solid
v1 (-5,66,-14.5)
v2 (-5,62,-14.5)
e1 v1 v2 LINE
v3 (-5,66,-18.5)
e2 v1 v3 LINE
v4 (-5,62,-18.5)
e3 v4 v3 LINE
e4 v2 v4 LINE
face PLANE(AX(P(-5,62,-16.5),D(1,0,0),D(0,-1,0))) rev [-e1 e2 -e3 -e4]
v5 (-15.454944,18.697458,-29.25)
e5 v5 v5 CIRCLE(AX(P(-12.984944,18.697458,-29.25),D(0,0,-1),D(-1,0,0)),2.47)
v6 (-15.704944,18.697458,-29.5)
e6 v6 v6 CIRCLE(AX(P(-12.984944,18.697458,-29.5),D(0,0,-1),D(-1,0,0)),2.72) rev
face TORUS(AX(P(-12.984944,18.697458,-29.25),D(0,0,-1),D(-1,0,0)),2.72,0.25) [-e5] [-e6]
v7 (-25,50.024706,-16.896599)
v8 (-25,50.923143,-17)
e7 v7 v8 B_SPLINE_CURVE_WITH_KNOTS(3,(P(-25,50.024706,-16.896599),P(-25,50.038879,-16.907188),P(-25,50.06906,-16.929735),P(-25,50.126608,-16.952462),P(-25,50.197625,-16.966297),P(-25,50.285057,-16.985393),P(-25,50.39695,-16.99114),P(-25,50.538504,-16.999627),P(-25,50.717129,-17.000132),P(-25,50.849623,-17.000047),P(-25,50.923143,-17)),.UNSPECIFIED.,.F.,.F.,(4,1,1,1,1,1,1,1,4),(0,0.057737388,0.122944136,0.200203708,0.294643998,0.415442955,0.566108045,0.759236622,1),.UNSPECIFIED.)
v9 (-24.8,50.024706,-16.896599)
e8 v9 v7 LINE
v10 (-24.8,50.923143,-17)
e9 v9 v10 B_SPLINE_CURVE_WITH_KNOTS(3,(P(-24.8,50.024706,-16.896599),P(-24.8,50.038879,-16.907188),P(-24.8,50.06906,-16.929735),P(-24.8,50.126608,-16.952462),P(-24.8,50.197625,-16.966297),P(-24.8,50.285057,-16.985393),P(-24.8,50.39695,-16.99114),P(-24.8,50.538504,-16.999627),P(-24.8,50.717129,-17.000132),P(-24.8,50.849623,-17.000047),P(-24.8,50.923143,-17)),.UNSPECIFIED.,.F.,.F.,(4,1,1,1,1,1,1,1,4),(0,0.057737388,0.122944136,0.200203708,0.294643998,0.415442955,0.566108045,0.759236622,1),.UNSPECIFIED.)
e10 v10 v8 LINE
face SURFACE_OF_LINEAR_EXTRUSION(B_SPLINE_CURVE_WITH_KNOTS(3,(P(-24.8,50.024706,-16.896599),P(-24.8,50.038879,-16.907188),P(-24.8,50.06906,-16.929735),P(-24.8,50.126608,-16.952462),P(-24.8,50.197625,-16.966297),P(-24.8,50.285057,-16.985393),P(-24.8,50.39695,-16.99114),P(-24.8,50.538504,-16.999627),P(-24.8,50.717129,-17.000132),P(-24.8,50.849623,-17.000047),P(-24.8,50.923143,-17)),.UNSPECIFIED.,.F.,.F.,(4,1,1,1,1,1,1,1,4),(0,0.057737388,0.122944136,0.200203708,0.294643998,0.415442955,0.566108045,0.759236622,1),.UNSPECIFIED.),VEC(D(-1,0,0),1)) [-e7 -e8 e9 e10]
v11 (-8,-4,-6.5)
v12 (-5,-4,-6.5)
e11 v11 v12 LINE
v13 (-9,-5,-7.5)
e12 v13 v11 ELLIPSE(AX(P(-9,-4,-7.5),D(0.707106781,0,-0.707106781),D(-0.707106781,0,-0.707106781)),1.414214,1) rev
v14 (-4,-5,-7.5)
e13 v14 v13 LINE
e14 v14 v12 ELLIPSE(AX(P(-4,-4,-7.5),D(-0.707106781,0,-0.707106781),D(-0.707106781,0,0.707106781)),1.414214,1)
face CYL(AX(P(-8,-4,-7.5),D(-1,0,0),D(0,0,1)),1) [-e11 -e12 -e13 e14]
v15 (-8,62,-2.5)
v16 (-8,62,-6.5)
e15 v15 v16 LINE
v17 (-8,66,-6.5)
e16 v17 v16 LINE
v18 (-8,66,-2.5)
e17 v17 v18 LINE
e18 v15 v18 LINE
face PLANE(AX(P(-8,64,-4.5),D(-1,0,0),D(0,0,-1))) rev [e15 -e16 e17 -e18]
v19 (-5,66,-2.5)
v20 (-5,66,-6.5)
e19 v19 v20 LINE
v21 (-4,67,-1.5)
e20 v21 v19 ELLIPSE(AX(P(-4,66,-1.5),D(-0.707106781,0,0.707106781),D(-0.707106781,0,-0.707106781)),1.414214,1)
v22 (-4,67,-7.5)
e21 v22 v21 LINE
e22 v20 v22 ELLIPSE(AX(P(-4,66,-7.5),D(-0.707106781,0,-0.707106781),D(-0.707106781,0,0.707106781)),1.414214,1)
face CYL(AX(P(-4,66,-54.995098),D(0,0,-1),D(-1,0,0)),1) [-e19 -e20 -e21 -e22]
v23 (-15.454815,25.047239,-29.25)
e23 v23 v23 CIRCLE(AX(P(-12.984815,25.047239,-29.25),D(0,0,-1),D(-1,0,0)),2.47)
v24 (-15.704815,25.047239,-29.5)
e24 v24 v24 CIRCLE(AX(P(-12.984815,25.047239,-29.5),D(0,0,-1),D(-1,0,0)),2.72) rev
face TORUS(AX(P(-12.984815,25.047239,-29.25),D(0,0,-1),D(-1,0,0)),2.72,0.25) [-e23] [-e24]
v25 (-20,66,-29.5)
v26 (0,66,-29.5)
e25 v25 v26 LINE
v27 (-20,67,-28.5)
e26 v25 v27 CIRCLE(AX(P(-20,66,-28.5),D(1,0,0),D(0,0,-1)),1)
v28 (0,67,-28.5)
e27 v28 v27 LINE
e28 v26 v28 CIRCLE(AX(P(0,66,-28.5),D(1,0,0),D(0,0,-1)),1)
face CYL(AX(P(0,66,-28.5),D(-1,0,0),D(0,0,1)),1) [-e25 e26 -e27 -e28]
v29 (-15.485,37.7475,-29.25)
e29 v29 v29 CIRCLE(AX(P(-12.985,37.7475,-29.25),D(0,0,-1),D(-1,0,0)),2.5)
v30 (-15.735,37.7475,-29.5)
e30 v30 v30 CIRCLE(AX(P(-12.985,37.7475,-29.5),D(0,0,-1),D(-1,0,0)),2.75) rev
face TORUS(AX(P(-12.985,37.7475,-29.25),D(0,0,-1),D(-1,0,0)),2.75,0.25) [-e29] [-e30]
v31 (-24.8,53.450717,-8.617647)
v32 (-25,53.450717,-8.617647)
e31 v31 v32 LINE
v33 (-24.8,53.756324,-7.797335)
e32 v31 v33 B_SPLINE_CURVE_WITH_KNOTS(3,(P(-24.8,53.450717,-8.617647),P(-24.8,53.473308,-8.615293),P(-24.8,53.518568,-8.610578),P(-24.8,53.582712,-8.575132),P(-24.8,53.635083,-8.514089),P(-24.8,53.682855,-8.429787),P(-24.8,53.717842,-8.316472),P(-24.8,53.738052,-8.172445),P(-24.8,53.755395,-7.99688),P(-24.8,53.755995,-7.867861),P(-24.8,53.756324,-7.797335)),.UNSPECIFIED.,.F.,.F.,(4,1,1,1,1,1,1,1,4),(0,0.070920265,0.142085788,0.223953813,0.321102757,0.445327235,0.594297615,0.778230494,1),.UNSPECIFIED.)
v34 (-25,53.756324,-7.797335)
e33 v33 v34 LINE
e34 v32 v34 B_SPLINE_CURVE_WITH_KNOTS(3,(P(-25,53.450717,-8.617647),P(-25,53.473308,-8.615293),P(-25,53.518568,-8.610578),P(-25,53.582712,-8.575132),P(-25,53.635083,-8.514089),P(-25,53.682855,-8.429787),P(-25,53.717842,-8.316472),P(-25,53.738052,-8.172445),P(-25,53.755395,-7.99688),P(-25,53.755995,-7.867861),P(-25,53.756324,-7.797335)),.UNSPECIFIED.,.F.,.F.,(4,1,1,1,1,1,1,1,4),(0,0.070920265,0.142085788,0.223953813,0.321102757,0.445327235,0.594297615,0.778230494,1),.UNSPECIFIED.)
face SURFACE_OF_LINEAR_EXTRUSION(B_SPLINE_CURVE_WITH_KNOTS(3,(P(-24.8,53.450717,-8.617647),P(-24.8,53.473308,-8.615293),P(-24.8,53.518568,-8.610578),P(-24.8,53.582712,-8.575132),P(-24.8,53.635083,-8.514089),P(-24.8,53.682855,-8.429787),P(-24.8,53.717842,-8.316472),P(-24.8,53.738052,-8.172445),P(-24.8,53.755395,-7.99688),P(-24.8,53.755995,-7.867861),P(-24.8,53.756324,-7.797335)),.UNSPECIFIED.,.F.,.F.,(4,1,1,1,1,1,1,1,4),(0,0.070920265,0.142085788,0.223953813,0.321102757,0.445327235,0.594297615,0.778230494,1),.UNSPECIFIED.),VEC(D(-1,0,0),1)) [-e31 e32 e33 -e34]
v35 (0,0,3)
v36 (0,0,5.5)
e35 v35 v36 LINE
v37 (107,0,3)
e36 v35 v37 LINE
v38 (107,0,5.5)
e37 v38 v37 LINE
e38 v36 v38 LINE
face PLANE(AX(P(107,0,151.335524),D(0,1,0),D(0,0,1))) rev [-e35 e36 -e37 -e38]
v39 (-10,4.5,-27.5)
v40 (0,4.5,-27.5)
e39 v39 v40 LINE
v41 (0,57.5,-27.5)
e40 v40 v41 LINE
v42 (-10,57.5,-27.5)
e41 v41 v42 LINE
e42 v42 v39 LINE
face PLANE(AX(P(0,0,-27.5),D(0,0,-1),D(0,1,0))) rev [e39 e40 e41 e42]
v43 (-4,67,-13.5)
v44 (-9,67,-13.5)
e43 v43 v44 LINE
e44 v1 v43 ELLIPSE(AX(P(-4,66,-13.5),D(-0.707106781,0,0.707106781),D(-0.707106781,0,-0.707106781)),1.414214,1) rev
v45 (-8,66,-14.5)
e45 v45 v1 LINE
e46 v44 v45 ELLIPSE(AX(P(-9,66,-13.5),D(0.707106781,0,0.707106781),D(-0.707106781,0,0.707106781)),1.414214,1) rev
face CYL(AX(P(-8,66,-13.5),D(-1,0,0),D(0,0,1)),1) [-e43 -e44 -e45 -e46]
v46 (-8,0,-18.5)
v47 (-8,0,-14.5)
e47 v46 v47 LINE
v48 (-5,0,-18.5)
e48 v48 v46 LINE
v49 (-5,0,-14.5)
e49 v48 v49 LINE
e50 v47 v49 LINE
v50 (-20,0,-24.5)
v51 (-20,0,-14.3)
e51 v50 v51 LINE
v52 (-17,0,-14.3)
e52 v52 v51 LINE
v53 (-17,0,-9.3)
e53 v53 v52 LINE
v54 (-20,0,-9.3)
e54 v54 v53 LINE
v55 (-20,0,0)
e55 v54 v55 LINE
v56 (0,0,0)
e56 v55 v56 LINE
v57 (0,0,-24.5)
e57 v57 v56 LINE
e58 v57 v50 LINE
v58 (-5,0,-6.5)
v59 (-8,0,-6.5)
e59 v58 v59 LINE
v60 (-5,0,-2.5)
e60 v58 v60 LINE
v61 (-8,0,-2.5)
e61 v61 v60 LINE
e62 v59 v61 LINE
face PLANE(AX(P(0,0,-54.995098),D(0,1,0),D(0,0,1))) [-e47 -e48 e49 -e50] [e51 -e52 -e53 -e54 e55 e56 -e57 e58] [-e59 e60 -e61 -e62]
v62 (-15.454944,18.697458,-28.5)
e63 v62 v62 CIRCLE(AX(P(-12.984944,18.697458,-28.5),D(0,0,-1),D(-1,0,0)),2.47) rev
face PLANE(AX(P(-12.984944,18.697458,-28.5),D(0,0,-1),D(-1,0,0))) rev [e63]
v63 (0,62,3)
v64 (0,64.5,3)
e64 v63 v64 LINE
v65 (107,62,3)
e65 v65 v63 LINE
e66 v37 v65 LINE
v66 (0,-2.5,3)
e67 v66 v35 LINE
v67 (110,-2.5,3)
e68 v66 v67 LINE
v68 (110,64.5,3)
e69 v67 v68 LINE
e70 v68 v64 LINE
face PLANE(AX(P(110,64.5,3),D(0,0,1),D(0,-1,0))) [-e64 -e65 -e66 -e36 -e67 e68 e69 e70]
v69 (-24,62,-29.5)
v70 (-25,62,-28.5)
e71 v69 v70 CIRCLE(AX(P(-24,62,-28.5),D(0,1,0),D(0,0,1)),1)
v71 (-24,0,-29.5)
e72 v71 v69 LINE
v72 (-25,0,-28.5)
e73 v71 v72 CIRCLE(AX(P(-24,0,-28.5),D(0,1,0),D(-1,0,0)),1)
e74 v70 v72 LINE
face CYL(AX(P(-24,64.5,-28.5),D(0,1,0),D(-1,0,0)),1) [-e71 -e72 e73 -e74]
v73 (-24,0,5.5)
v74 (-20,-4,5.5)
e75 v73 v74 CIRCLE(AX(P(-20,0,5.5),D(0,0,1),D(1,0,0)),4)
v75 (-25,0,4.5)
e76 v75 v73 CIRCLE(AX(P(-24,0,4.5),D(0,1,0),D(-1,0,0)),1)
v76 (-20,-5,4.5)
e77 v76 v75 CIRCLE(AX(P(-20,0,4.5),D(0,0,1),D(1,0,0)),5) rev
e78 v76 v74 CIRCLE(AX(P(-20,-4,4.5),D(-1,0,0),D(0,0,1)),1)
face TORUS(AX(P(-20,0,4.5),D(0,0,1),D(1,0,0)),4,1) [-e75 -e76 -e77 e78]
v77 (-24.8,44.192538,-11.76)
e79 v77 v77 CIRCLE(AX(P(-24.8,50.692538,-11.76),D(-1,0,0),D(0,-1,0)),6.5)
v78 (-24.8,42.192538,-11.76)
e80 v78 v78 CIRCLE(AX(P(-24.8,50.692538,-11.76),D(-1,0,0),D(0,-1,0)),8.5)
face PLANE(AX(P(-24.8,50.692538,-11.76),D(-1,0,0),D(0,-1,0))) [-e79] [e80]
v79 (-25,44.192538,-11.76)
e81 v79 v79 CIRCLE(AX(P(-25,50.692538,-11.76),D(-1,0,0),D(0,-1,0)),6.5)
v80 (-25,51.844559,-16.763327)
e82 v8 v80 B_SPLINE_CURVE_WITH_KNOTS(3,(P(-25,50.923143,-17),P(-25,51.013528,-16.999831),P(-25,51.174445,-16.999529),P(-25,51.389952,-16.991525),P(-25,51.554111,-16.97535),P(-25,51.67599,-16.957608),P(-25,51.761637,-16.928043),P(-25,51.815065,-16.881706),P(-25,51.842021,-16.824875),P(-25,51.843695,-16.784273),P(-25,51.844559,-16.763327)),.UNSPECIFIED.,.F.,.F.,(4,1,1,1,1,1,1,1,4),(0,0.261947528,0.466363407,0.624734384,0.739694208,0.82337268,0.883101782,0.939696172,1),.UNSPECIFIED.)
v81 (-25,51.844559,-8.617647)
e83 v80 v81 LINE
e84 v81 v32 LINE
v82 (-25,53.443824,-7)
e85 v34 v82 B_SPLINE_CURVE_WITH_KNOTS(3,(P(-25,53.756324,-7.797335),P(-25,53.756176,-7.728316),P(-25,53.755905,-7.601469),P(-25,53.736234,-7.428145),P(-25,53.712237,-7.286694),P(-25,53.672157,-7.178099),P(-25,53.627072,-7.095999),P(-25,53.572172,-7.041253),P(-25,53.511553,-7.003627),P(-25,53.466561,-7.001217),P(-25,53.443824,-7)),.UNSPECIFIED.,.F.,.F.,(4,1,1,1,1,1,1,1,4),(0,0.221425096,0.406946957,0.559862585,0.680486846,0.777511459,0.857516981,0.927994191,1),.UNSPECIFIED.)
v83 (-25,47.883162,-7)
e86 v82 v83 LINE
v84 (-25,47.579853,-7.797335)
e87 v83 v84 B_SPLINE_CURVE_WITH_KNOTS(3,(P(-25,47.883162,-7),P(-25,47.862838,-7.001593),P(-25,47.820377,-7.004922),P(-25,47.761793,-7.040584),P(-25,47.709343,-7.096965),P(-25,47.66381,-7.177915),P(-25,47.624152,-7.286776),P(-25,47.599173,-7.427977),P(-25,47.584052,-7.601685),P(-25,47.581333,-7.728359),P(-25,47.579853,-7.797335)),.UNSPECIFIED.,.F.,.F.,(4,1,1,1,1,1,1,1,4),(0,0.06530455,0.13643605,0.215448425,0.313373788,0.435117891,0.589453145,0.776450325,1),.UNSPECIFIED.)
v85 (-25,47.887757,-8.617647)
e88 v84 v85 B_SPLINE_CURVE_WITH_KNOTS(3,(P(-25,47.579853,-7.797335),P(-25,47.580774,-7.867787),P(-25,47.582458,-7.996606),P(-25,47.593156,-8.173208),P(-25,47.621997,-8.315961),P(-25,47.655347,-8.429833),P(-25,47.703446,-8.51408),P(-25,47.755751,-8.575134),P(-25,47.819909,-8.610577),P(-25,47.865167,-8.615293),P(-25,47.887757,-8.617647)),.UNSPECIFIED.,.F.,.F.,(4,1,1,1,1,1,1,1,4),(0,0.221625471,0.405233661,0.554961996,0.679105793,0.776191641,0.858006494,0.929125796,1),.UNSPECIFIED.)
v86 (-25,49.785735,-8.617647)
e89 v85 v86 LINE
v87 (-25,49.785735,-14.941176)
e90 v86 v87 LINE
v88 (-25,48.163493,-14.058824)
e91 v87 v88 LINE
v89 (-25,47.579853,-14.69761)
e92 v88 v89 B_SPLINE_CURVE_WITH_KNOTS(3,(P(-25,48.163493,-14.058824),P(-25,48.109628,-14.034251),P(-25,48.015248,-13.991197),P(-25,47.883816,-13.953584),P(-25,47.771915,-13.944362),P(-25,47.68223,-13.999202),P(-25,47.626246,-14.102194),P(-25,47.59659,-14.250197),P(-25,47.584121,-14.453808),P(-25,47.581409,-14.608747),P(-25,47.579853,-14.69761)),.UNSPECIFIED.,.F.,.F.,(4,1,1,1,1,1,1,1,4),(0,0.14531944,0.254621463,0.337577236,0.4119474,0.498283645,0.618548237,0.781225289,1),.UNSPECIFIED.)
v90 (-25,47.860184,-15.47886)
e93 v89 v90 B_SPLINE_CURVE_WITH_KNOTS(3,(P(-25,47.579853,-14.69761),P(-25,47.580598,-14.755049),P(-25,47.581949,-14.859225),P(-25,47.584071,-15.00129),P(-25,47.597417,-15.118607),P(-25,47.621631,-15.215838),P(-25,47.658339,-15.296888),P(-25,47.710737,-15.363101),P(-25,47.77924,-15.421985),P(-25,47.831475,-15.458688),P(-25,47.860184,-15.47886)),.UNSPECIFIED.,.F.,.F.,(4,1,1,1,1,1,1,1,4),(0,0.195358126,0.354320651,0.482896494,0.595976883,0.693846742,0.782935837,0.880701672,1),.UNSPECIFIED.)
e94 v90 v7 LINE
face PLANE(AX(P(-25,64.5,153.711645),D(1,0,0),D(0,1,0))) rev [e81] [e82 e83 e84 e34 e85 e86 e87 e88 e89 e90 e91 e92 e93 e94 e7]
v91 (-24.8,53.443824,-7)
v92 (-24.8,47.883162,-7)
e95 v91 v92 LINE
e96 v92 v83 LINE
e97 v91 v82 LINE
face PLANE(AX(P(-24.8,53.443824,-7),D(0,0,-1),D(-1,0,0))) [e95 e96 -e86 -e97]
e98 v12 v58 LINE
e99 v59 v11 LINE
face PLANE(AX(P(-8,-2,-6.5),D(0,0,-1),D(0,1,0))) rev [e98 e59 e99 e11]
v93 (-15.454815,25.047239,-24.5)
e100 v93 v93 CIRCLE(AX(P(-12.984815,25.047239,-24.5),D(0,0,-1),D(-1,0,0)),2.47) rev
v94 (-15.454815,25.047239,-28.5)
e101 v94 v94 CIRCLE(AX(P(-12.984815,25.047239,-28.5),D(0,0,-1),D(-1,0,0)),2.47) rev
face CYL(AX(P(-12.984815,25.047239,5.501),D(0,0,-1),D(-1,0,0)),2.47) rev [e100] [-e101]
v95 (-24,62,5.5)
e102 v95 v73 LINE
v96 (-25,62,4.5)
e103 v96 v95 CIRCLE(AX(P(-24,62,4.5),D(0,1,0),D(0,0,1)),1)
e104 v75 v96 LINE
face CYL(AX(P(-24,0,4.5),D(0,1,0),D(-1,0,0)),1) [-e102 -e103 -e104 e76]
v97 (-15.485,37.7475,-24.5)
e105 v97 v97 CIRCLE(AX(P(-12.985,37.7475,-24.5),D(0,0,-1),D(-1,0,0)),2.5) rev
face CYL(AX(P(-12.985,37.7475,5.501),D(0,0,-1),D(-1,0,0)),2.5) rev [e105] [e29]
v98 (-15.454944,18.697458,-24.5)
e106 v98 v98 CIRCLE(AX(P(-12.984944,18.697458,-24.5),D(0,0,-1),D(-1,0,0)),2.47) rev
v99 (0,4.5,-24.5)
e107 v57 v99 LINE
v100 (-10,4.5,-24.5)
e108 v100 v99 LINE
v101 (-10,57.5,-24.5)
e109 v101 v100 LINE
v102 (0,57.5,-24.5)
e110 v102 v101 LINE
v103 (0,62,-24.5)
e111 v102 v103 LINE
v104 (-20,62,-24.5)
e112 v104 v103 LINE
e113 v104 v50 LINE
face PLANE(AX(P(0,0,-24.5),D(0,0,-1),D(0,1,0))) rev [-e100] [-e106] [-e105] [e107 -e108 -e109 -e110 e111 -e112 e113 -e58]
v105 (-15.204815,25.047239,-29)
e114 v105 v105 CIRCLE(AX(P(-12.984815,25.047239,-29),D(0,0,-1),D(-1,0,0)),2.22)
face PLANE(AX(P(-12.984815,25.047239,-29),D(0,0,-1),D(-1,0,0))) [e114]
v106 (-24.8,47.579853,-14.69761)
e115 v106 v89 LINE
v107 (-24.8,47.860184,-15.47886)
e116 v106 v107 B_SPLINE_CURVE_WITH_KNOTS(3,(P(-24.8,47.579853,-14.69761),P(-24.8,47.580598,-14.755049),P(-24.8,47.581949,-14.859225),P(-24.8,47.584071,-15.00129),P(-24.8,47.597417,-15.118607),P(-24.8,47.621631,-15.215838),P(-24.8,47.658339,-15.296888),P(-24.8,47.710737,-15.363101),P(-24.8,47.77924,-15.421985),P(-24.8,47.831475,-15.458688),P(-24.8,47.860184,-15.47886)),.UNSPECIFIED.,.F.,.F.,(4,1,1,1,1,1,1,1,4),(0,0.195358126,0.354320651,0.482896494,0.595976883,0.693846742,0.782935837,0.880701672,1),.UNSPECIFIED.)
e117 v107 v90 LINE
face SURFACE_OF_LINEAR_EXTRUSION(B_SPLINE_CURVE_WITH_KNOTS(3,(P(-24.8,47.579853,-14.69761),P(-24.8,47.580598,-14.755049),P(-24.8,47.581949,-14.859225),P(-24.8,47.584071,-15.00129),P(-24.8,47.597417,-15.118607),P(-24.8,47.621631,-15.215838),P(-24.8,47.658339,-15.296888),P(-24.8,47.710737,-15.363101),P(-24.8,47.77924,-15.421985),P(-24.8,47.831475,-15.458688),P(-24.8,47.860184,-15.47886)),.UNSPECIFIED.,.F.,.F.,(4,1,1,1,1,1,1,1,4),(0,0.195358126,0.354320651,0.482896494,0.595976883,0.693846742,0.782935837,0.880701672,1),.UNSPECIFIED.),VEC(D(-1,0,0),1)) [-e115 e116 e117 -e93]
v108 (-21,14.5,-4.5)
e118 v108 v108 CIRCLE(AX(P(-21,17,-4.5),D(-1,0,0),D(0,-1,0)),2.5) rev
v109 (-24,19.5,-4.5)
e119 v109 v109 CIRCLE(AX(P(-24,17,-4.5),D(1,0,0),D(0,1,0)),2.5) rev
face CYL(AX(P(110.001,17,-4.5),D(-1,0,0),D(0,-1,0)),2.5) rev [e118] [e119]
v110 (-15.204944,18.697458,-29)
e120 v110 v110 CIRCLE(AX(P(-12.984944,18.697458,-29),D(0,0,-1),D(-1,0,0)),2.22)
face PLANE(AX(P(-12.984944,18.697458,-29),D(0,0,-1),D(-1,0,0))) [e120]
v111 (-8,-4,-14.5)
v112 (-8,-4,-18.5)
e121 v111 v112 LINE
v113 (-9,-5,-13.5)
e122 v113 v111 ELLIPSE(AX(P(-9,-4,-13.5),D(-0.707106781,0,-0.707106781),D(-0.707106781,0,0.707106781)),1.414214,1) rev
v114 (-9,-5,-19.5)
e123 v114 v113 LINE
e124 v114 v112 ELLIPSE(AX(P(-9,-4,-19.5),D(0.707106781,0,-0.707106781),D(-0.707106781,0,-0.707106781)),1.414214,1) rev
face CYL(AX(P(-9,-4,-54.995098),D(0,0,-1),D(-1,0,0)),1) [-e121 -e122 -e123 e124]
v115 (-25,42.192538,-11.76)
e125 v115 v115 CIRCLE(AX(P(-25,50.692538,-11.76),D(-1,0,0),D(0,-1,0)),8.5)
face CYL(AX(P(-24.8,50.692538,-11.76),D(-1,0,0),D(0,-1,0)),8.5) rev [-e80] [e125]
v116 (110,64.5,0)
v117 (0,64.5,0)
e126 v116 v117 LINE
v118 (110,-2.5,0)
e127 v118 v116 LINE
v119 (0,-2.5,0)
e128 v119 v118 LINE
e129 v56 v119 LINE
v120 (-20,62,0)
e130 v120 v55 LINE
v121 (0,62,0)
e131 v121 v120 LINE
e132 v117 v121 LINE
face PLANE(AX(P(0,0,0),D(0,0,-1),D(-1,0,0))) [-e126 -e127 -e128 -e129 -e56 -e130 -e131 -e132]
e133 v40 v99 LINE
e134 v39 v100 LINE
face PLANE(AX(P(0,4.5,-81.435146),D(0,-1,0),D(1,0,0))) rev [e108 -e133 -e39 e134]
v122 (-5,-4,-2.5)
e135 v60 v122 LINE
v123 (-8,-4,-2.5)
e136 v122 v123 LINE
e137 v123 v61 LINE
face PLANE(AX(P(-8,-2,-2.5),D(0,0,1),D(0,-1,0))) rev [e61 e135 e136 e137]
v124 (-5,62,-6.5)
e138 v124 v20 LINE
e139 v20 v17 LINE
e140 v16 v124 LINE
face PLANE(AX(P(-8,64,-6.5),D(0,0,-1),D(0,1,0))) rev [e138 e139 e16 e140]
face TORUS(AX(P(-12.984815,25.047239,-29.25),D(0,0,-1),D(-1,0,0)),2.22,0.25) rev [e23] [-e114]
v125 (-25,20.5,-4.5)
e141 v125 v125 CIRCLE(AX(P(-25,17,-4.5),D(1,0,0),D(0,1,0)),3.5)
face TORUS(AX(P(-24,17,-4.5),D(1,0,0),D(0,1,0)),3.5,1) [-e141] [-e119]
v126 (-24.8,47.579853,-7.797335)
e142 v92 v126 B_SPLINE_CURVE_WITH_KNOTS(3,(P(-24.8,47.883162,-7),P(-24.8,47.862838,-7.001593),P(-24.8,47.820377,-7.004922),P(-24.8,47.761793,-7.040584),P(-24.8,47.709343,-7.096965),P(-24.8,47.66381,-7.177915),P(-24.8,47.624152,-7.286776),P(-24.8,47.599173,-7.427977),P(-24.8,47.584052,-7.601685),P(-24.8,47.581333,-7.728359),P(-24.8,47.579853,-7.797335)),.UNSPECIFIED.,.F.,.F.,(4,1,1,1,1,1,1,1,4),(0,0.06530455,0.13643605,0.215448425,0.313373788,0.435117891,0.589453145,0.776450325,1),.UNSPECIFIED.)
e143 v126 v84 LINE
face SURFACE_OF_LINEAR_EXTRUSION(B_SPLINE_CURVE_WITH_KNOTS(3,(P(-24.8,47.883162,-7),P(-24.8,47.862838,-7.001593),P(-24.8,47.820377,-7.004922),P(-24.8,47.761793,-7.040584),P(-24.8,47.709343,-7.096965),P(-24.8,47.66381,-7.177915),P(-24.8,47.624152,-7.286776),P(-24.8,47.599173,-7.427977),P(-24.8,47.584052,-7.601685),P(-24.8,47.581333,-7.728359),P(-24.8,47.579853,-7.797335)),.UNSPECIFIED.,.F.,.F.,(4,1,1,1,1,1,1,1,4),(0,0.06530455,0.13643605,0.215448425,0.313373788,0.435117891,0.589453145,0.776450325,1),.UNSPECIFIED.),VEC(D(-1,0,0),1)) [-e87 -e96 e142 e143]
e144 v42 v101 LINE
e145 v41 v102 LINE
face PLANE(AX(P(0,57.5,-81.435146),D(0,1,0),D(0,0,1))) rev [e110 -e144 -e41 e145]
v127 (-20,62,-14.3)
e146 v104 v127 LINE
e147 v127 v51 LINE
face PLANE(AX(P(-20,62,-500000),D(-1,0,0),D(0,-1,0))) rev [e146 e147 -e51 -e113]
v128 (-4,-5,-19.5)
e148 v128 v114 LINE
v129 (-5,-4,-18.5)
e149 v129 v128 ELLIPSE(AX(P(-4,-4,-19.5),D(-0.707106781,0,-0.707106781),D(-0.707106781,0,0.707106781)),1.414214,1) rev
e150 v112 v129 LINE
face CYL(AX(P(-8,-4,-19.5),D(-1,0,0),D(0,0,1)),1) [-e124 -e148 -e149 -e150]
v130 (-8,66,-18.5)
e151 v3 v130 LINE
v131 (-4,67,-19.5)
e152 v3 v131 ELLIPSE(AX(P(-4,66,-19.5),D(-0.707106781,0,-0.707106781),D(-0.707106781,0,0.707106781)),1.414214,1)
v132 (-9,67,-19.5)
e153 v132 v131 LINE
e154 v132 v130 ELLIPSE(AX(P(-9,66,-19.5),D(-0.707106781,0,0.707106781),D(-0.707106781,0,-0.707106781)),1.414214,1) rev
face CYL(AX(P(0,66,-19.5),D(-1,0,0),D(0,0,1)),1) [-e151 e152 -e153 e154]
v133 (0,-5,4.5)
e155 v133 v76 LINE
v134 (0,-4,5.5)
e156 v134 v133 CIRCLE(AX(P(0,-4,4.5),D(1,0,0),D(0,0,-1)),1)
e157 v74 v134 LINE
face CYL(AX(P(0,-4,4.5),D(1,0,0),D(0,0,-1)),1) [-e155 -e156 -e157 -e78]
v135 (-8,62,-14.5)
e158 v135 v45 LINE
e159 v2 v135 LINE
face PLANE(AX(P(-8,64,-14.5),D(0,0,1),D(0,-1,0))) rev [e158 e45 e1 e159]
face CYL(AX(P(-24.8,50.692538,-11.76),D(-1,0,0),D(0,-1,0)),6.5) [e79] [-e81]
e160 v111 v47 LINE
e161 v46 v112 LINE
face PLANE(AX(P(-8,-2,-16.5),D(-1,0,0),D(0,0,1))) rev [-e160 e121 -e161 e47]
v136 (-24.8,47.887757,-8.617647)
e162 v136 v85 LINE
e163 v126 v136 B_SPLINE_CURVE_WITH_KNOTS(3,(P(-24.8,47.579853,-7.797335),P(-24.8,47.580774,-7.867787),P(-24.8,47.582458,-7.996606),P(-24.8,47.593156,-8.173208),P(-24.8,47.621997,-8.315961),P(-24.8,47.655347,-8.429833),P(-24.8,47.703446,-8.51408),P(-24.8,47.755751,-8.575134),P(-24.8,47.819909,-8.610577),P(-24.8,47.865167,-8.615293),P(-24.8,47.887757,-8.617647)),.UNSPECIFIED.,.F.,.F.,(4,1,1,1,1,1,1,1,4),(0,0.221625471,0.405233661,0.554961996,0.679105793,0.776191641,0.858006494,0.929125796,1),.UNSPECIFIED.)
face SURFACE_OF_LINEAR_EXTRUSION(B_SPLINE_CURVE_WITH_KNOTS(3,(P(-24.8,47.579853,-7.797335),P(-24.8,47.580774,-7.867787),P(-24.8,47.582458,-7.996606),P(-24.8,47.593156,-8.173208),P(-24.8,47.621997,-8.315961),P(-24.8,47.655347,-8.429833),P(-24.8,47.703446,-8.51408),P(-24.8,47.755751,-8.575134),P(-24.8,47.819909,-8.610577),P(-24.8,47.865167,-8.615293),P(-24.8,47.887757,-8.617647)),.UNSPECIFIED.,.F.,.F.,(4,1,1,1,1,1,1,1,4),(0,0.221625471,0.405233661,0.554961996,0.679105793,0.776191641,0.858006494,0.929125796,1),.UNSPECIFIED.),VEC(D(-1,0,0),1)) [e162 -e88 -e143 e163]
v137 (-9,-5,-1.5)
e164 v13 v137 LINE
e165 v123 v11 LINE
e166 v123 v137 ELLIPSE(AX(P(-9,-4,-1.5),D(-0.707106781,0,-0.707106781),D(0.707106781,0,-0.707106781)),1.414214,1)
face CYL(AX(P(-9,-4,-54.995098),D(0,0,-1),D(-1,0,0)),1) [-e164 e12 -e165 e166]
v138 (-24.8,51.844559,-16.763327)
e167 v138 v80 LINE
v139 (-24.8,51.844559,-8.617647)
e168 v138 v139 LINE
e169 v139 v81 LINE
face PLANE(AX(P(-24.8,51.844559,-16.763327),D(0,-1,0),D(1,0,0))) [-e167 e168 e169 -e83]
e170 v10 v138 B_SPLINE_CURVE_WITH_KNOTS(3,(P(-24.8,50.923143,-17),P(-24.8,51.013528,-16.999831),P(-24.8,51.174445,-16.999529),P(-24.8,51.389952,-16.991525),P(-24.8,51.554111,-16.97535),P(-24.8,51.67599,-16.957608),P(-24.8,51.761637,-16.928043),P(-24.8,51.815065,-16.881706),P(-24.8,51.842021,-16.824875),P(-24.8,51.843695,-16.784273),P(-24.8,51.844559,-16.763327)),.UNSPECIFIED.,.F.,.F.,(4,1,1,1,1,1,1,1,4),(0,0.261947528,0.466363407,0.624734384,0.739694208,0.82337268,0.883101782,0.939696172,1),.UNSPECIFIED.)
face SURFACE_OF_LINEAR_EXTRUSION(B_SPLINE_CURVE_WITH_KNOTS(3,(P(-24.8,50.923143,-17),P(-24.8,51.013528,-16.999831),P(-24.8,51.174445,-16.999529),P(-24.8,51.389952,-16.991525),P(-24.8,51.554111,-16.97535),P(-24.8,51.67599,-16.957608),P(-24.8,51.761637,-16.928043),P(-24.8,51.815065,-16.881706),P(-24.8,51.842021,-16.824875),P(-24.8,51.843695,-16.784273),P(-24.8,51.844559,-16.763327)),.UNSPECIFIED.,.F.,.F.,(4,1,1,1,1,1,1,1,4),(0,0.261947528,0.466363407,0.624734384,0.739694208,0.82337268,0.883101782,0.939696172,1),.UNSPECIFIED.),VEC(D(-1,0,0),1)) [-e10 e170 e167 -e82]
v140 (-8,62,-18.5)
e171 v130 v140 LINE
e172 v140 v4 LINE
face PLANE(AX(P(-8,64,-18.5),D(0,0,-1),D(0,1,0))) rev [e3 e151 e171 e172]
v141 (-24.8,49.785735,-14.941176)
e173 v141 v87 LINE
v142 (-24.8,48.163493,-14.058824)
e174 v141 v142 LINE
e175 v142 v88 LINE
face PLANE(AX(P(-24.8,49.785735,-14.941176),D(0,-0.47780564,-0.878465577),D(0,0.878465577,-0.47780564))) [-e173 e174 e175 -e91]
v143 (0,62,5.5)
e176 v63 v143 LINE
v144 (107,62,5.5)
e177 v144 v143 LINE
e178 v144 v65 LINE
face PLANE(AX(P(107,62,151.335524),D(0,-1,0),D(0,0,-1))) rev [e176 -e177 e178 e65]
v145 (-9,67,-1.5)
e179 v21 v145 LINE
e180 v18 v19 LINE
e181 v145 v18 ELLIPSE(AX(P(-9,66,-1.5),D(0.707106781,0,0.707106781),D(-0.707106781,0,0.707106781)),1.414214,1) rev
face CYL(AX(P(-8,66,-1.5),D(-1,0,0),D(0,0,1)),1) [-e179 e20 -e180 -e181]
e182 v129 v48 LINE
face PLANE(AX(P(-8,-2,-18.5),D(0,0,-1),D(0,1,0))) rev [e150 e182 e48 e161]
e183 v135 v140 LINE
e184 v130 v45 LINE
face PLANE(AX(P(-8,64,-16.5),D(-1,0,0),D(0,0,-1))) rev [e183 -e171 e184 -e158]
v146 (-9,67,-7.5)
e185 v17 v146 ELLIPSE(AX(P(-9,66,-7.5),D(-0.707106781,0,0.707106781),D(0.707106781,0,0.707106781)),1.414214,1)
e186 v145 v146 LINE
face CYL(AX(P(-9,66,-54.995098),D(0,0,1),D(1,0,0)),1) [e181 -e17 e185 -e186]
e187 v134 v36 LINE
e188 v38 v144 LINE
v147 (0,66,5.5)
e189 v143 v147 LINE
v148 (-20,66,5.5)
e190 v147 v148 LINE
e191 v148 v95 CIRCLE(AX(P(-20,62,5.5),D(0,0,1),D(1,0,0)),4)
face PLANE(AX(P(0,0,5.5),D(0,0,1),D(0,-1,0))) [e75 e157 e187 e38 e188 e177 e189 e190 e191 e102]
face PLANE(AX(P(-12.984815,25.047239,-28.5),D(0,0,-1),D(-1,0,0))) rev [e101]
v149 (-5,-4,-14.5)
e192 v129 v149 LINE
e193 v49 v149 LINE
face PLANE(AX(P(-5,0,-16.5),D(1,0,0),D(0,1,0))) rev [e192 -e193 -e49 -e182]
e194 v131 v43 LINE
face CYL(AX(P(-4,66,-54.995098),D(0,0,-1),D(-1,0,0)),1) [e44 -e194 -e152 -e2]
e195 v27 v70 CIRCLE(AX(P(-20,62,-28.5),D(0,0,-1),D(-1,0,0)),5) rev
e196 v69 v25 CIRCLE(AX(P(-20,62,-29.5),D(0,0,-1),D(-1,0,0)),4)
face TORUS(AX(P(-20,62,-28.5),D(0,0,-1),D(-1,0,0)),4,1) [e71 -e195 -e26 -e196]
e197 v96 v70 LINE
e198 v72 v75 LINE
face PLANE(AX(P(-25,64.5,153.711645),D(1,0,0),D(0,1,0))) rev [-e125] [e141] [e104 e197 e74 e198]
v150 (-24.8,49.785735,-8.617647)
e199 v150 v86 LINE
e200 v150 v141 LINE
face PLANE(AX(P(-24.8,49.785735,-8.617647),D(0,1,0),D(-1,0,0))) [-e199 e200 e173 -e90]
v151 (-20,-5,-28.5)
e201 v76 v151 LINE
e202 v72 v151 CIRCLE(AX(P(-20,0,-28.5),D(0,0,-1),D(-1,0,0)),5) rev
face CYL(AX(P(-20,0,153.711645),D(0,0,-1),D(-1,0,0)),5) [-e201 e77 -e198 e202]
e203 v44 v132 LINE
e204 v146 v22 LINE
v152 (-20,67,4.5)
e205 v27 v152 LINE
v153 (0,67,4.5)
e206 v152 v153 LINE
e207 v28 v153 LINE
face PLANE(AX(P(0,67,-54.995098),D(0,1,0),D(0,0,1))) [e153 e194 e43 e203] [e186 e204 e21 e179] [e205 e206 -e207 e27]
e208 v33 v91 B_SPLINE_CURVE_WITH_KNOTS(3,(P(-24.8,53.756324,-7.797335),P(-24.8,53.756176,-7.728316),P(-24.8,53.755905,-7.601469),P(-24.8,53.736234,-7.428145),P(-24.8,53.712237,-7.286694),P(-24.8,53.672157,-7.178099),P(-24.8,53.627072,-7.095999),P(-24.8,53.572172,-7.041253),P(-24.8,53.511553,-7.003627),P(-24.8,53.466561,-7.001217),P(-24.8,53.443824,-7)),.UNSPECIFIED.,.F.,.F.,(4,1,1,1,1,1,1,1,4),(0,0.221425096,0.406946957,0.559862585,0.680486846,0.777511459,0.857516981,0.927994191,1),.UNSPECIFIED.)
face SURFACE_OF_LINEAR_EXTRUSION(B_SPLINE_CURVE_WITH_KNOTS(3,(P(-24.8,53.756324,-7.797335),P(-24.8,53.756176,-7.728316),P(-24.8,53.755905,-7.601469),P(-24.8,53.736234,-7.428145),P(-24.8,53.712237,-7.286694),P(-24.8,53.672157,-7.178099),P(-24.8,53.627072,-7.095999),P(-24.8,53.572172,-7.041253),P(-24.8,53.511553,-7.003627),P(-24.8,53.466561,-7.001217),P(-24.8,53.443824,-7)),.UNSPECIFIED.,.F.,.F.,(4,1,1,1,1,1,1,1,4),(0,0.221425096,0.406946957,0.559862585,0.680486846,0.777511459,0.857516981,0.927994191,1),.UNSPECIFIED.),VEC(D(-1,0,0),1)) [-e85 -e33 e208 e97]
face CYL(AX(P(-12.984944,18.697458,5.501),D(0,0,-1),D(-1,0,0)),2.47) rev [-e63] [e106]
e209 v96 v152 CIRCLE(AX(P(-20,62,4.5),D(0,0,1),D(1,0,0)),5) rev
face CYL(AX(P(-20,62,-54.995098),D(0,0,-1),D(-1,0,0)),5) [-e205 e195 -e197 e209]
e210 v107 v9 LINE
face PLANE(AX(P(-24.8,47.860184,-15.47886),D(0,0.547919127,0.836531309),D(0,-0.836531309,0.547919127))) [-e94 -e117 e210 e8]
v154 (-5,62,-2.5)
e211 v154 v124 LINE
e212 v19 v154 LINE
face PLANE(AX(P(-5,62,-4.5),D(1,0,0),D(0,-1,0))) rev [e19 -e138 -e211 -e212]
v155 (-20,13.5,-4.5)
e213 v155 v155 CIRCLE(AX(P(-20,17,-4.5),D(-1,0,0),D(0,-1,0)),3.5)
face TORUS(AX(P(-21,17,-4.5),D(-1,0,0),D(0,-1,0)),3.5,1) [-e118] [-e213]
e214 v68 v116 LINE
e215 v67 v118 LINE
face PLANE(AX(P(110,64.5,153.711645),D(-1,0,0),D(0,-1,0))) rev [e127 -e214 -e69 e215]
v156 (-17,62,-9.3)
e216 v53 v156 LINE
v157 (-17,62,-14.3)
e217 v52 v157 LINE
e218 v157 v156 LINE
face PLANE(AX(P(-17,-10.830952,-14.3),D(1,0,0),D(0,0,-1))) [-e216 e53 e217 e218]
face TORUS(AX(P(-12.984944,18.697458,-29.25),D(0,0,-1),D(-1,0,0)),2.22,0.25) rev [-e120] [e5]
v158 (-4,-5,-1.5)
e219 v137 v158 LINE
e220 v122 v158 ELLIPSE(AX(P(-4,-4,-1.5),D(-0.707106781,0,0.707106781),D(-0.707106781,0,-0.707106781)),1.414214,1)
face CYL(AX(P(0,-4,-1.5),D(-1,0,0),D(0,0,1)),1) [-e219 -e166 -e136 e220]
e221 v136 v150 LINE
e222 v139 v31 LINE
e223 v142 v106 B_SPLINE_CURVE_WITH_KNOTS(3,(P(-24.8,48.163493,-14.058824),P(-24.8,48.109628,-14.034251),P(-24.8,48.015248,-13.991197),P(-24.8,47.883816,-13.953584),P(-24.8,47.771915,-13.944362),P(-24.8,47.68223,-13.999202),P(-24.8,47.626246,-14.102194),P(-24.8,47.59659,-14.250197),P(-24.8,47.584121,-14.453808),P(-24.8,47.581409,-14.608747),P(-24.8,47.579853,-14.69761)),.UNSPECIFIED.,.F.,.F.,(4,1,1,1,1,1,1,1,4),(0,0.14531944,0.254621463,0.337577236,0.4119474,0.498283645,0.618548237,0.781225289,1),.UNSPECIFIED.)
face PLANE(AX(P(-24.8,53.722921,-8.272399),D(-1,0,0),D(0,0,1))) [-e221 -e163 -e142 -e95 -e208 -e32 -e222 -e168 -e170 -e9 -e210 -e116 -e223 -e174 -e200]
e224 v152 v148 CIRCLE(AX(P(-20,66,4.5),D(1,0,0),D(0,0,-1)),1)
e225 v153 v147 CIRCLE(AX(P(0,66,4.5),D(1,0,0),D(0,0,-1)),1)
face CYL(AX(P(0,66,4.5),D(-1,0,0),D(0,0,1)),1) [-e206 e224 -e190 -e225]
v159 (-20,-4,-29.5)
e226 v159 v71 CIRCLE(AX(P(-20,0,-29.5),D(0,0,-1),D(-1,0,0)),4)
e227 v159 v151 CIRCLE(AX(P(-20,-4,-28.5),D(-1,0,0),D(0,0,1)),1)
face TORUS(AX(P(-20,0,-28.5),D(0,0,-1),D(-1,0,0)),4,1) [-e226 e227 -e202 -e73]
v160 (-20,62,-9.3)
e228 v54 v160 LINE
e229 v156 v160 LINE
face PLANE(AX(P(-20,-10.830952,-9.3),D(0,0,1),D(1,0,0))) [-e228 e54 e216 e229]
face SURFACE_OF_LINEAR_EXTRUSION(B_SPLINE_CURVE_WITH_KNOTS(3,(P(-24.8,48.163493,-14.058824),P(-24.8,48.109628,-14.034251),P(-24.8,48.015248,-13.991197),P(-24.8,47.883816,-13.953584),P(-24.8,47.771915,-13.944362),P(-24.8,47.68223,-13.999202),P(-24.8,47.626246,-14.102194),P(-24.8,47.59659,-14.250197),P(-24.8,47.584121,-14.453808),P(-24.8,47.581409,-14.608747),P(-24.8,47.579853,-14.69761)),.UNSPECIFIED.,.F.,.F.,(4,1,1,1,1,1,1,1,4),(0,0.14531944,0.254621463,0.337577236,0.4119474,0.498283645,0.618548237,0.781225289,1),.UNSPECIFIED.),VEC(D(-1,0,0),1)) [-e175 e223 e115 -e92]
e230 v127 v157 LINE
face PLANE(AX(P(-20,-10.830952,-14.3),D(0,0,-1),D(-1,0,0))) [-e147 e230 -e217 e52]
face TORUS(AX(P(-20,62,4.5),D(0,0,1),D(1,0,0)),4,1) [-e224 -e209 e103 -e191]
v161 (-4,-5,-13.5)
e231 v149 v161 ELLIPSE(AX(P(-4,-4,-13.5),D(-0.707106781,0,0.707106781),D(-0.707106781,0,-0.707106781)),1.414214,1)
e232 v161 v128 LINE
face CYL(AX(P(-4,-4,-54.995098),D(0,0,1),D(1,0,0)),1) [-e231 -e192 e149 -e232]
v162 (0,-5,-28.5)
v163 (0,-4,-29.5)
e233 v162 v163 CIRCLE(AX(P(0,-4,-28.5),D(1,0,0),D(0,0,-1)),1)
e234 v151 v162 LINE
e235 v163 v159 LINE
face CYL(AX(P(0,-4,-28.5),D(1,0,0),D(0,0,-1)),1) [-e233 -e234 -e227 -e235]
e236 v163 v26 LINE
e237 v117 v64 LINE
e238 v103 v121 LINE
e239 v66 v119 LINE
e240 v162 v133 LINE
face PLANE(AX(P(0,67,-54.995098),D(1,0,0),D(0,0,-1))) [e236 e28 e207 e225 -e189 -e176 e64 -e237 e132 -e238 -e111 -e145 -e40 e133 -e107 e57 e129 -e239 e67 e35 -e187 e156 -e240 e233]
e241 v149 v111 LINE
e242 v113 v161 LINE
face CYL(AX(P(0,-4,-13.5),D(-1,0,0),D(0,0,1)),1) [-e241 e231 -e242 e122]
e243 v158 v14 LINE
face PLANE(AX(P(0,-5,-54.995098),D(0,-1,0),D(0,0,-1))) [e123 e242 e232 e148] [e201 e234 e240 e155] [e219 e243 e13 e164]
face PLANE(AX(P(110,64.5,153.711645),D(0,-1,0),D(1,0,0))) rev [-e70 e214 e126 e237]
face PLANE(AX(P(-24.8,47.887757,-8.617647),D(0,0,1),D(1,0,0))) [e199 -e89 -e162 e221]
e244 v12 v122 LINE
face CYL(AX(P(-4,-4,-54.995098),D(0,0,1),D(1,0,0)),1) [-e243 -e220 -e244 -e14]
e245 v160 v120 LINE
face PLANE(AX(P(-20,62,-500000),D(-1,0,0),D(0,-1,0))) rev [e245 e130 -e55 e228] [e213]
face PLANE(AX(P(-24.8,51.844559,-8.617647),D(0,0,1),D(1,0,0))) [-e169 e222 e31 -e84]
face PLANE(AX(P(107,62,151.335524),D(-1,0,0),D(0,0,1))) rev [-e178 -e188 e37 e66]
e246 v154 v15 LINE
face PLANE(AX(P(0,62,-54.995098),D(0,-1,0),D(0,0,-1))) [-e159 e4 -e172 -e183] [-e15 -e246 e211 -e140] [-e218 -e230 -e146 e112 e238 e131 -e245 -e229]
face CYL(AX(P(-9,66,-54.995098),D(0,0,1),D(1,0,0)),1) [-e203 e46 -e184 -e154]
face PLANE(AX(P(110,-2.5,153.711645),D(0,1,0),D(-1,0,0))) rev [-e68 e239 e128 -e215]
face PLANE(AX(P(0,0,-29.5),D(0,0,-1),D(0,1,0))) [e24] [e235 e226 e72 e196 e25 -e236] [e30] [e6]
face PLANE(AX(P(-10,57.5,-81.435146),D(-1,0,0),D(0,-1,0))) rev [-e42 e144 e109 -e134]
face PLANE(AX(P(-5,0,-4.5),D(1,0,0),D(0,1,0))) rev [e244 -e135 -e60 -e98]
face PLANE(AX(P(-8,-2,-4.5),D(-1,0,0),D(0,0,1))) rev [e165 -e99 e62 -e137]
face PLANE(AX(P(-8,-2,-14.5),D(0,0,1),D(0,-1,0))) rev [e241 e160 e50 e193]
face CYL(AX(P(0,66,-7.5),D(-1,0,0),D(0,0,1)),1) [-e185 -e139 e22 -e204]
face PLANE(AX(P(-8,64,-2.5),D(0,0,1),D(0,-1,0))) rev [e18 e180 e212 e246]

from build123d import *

# Parameters (mm, degrees)
ESQUISSE1_W                 = 135
ESQUISSE1_H                 = 67
BOSS_EXTRU_1_DEPTH          = 3
ESQUISSE3_W                 = 132
ESQUISSE3_H                 = 62
BOSS_EXTRU_2_DEPTH          = 2.5
ESQUISSE4_W                 = 25
ESQUISSE4_H                 = 5
BOSS_EXTRU_3_DEPTH          = 35
BOSS_EXTRU_4_START          = -5
ESQUISSE5_W                 = 25
ESQUISSE5_H                 = 72
BOSS_EXTRU_4_DEPTH          = 5
ENL_V_MAT_EXTRU_2_REACH     = 135.469
ESQUISSE10_R                = 2.47
ESQUISSE10_R_2              = 2.5
ENL_V_START                 = -3
ESQUISSE11_W                = 10
ESQUISSE11_H                = 53
ENL_V_MAT_EXTRU_3_DEPTH     = 3
ESQUISSE13_R                = 2.47
BOSS_EXTRU_5_DEPTH          = 1
BOSS_EXTRU_6_REACH          = 134.133
ESQUISSE14_W                = 5
ESQUISSE14_H                = 62
ESQUISSE15_R                = 2.47
ENL_V_MAT_EXTRU_5_DEPTH     = 0.5
CONG_1_R                    = 0.25
ESQUISSE21_W                = 3
ESQUISSE21_H                = 5
BOSS_EXTRU_8_DEPTH          = 72
CONG_2_R                    = 5
CONG_3_R                    = 1
ENL_V_MAT_EXTRU_8_DEPTH     = 0.2
ESQUISSE25_R                = 8.5
ESQUISSE25_R_2              = 6.5
ENL_V_MAT_EXTRU_9_DEPTH     = 0.2
ENL_V_MAT_EXTRU_10_REACH    = 155.572
ESQUISSE26_R                = 2.5
CONG_4_R                    = 1
LOGEMENT_START              = -8
LOGEMENT_D_ERGOT1_OUTLINE_W = 5
LOGEMENT_D_ERGOT1_OUTLINE_H = 4
LOGEMENT_D_ERGOT1_DEPTH     = 3
LOGEMENT_D_ERGOT2_OUTLINE_W = 5
LOGEMENT_D_ERGOT2_OUTLINE_H = 4
LOGEMENT_D_ERGOT2_DEPTH     = 3
R_P_TITION_LIN_AIRE1_COUNT  = 2
R_P_TITION_LIN_AIRE1_PITCH  = 12
CONG_6_R                    = 1


# Read off the part's stored shape, not the designer's step: Logement d'ergot1, Logement d'ergot2
with BuildPart() as part:
    # Esquisse1 → Boss.-Extru.1 (new body)
    with BuildSketch(Plane.XY):
        with Locations((42.5, 31)):
            Rectangle(ESQUISSE1_W, ESQUISSE1_H)
    extrude(amount=BOSS_EXTRU_1_DEPTH)

    # Esquisse3 → Boss.-Extru.2 (add)
    with BuildSketch(Plane.XY.offset(3)):
        with Locations((41, 31)):
            Rectangle(ESQUISSE3_W, ESQUISSE3_H)
    extrude(amount=BOSS_EXTRU_2_DEPTH)

    # Esquisse4 → Boss.-Extru.3 (add)
    with BuildSketch(Plane.XY.offset(5.5)):
        with Locations((-12.5, 64.5)):
            Rectangle(ESQUISSE4_W, ESQUISSE4_H)
        with Locations((-12.5, -2.5)):
            Rectangle(ESQUISSE4_W, ESQUISSE4_H)
    extrude(amount=-BOSS_EXTRU_3_DEPTH)

    # Esquisse5 → Boss.-Extru.4 (add)
    with BuildSketch(Plane(origin=(0, 0, -29.5), x_dir=(-1, 0, 0), z_dir=(0, 0, -1)).offset(BOSS_EXTRU_4_START)):
        with Locations((12.5, 31)):
            Rectangle(ESQUISSE5_W, ESQUISSE5_H)
    extrude(amount=BOSS_EXTRU_4_DEPTH)

    # Esquisse10 → Enlèv. mat.-Extru.2 (cut, up to next)
    with BuildSketch(Plane(origin=(0, 0, -29.5), x_dir=(-1, 0, 0), z_dir=(0, 0, -1)), mode=Mode.PRIVATE) as enl_v_mat_extru_2_sk1:
        with Locations((12.984944126, 18.697458299)):
            Circle(ESQUISSE10_R)
    enl_v_mat_extru_2_tool1 = extrude(enl_v_mat_extru_2_sk1.sketch, amount=-ENL_V_MAT_EXTRU_2_REACH, mode=Mode.PRIVATE) & part.part
    # Esquisse10 → Enlèv. mat.-Extru.2 (cut, up to next)
    with BuildSketch(Plane(origin=(0, 0, -29.5), x_dir=(-1, 0, 0), z_dir=(0, 0, -1)), mode=Mode.PRIVATE) as enl_v_mat_extru_2_sk2:
        with Locations((12.984815451, 25.047239168)):
            Circle(ESQUISSE10_R)
    enl_v_mat_extru_2_tool2 = extrude(enl_v_mat_extru_2_sk2.sketch, amount=-ENL_V_MAT_EXTRU_2_REACH, mode=Mode.PRIVATE) & part.part
    # Esquisse10 → Enlèv. mat.-Extru.2 (cut, up to next)
    with BuildSketch(Plane(origin=(0, 0, -29.5), x_dir=(-1, 0, 0), z_dir=(0, 0, -1)), mode=Mode.PRIVATE) as enl_v_mat_extru_2_sk3:
        with Locations((12.985, 37.7475)):
            Circle(ESQUISSE10_R_2)
    enl_v_mat_extru_2_tool3 = extrude(enl_v_mat_extru_2_sk3.sketch, amount=-ENL_V_MAT_EXTRU_2_REACH, mode=Mode.PRIVATE) & part.part
    add(enl_v_mat_extru_2_tool1.solids().sort_by_distance((-12.984944, 18.697458, -29.5))[0], mode=Mode.SUBTRACT)
    add(enl_v_mat_extru_2_tool2.solids().sort_by_distance((-12.984815, 25.047239, -29.5))[0], mode=Mode.SUBTRACT)
    add(enl_v_mat_extru_2_tool3.solids().sort_by_distance((-12.985, 37.7475, -29.5))[0], mode=Mode.SUBTRACT)

    # Esquisse11 → Enlèv. mat.-Extru.3 (cut)
    with BuildSketch(Plane.XY.offset(-24.5).offset(ENL_V_START)):
        with Locations((-5, 31)):
            Rectangle(ESQUISSE11_W, ESQUISSE11_H)
    extrude(amount=ENL_V_MAT_EXTRU_3_DEPTH, mode=Mode.SUBTRACT)

    # Esquisse13 → Boss.-Extru.5 (add)
    with BuildSketch(Plane(origin=(0, 0, -29.5), x_dir=(-1, 0, 0), z_dir=(0, 0, -1))):
        with Locations((12.984815451, 25.047239168)):
            Circle(ESQUISSE13_R)
        with Locations((12.984944126, 18.697458299)):
            Circle(ESQUISSE13_R)
    extrude(amount=-BOSS_EXTRU_5_DEPTH)

    # Esquisse14 → Boss.-Extru.6 (add, up to next)
    with BuildSketch(Plane(origin=(0, 0, 0), x_dir=(-1, 0, 0), z_dir=(0, 0, -1)), mode=Mode.PRIVATE) as boss_extru_6_sk1:
        with Locations((22.5, 31)):
            Rectangle(ESQUISSE14_W, ESQUISSE14_H)
    boss_extru_6_tool1 = extrude(boss_extru_6_sk1.sketch, amount=BOSS_EXTRU_6_REACH, mode=Mode.PRIVATE) - part.part
    add(boss_extru_6_tool1.solids().sort_by_distance((-22.5, 31, 0))[0])

    # Esquisse15 → Enlèv. mat.-Extru.5 (cut)
    with BuildSketch(Plane(origin=(0, 0, -29.5), x_dir=(-1, 0, 0), z_dir=(0, 0, -1))):
        with Locations((12.984815451, 25.047239168)):
            Circle(ESQUISSE15_R)
        with Locations((12.984944126, 18.697458299)):
            Circle(ESQUISSE15_R)
    extrude(amount=-ENL_V_MAT_EXTRU_5_DEPTH, mode=Mode.SUBTRACT)

    # Congé1
    cong_1_edges = [part.edges().sort_by_distance(p)[0] for p in [
        (-10.485, 37.7475, -29.5),
        (-10.514815451, 25.047239168, -29),
        (-10.514815451, 25.047239168, -29.5),
        (-10.514944126, 18.697458299, -29),
        (-10.514944126, 18.697458299, -29.5),
    ]]
    fillet(cong_1_edges, radius=CONG_1_R - 0.0001)  # a hair under: the kernel refuses the full size

    # Esquisse21 → Boss.-Extru.8 (add)
    with BuildSketch(Plane(origin=(0, 67, 0), x_dir=(1, 0, 0), z_dir=(0, 1, 0))):
        with Locations((-18.5, 11.8)):
            Rectangle(ESQUISSE21_W, ESQUISSE21_H)
    extrude(amount=-BOSS_EXTRU_8_DEPTH)

    # Congé2
    cong_2_edges = [part.edges().sort_by_distance(p)[0] for p in [
        (-25, 67, -12),
        (-25, -5, -12),
    ]]
    fillet(cong_2_edges, radius=CONG_2_R)

    # Congé3
    cong_3_edges = [part.edges().sort_by_distance(p)[0] for p in [
        (-25, 31, 5.5),
        (-10, -5, 5.5),
        (-23.535533906, -3.535533906, 5.5),
        (-23.535533906, 65.535533906, 5.5),
        (-25, 31, -29.5),
        (-10, -5, -29.5),
        (-23.535533906, -3.535533906, -29.5),
        (-23.535533906, 65.535533906, -29.5),
        (-10, 67, 5.5),
        (-10, 67, -29.5),
    ]]
    fillet(cong_3_edges, radius=CONG_3_R)

    # Esquisse24 → Enlèv. mat.-Extru.8 (cut)
    with BuildSketch(Plane.ZY.offset(25)):
        with BuildLine():
            add(Edge.make_bspline(
                [(-7.797334559, 53.756323529), (-7.728315532, 53.756175872), (-7.601468651, 53.7559045), (-7.428145196, 53.736234261), (-7.286694326, 53.712237322), (-7.178098613, 53.672157419), (-7.095998501, 53.627072015), (-7.041252917, 53.572172359), (-7.003626634, 53.511552881), (-7.001217493, 53.466560876), (-7, 53.443823529)],
                knots=[0, 0, 0, 0, 1.771400766, 3.255575653, 4.478900681, 5.443894768, 6.220091676, 6.860135845, 7.423953526, 8, 8, 8, 8], degree=3))
            Line((-7, 53.443823529), (-7, 47.883161765))
            add(Edge.make_bspline(
                [(-7, 47.883161765), (-7.001593321, 47.862838122), (-7.00492213, 47.820377412), (-7.040583617, 47.761793101), (-7.096964513, 47.709342565), (-7.177915255, 47.663809955), (-7.286775543, 47.624151759), (-7.427976902, 47.599172825), (-7.601685227, 47.584051948), (-7.728358713, 47.581333294), (-7.797334559, 47.579852941)],
                knots=[0, 0, 0, 0, 0.522436398, 1.091488403, 1.723587402, 2.506990303, 3.480943124, 4.715625158, 6.211602601, 8, 8, 8, 8], degree=3))
            add(Edge.make_bspline(
                [(-7.797334559, 47.579852941), (-7.867786717, 47.580773828), (-7.996605782, 47.582457635), (-8.173207561, 47.593155762), (-8.315961488, 47.621997479), (-8.429833376, 47.655346871), (-8.514079758, 47.703445754), (-8.575133835, 47.75575082), (-8.610577391, 47.819908595), (-8.615293216, 47.865167141), (-8.617647059, 47.887757353)],
                knots=[0, 0, 0, 0, 1.773003767, 3.241869288, 4.439695969, 5.432846344, 6.20953313, 6.864051949, 7.43300637, 8, 8, 8, 8], degree=3))
            Line((-8.617647059, 47.887757353), (-8.617647059, 49.785735294))
            Line((-8.617647059, 49.785735294), (-14.941176471, 49.785735294))
            Line((-14.941176471, 49.785735294), (-14.058823529, 48.163492647))
            add(Edge.make_bspline(
                [(-14.058823529, 48.163492647), (-14.034251215, 48.109627764), (-13.991196833, 48.015248408), (-13.953583795, 47.88381649), (-13.944362206, 47.771915186), (-13.999202183, 47.682230452), (-14.102194358, 47.626246046), (-14.250196656, 47.59658994), (-14.453807512, 47.58412145), (-14.608747364, 47.581408757), (-14.697610294, 47.579852941)],
                knots=[0, 0, 0, 0, 1.162555523, 2.0369717, 2.700617888, 3.295579197, 3.986269157, 4.9483859, 6.24980231, 8, 8, 8, 8], degree=3))
            add(Edge.make_bspline(
                [(-14.697610294, 47.579852941), (-14.75504882, 47.580598029), (-14.859224961, 47.581949395), (-15.001289632, 47.584071474), (-15.118606847, 47.59741699), (-15.215838356, 47.621630964), (-15.296887854, 47.6583389), (-15.363101065, 47.710736647), (-15.421984833, 47.779239598), (-15.458688166, 47.83147518), (-15.478860294, 47.860183824)],
                knots=[0, 0, 0, 0, 1.562865005, 2.83456521, 3.863171953, 4.767815064, 5.550773938, 6.263486697, 7.045613374, 8, 8, 8, 8], degree=3))
            Line((-15.478860294, 47.860183824), (-16.896599265, 50.024705882))
            add(Edge.make_bspline(
                [(-16.896599265, 50.024705882), (-16.907187932, 50.038879245), (-16.929735099, 50.069059546), (-16.952461714, 50.126608011), (-16.966297115, 50.19762465), (-16.985392787, 50.285056956), (-16.99114045, 50.3969504), (-16.999626832, 50.53850419), (-17.000132424, 50.717129232), (-17.000047258, 50.849623378), (-17, 50.923143382)],
                knots=[0, 0, 0, 0, 0.4618991, 0.983553085, 1.601629665, 2.357151981, 3.323543642, 4.528864361, 6.073892979, 8, 8, 8, 8], degree=3))
            add(Edge.make_bspline(
                [(-17, 50.923143382), (-16.999830765, 51.013527737), (-16.999529463, 51.174445291), (-16.991524933, 51.389951645), (-16.975349625, 51.554110689), (-16.957607732, 51.675990464), (-16.928042836, 51.761637166), (-16.881705598, 51.815064511), (-16.824874861, 51.842020676), (-16.784272558, 51.843695064), (-16.763327206, 51.844558824)],
                knots=[0, 0, 0, 0, 2.095580226, 3.73090726, 4.997875071, 5.917553662, 6.586981439, 7.064814255, 7.517569373, 8, 8, 8, 8], degree=3))
            Line((-16.763327206, 51.844558824), (-8.617647059, 51.844558824))
            Line((-8.617647059, 51.844558824), (-8.617647059, 53.450716912))
            add(Edge.make_bspline(
                [(-8.617647059, 53.450716912), (-8.615293369, 53.473308016), (-8.610577851, 53.51856835), (-8.57513187, 53.582712006), (-8.514089062, 53.63508267), (-8.429786556, 53.682854853), (-8.316471675, 53.717842497), (-8.17244512, 53.738051789), (-7.996880324, 53.75539496), (-7.867860691, 53.755995342), (-7.797334559, 53.756323529)],
                knots=[0, 0, 0, 0, 0.567362121, 1.136686307, 1.7916305, 2.568822057, 3.562617884, 4.754380918, 6.225843952, 8, 8, 8, 8], degree=3))
        make_face()
    extrude(amount=-ENL_V_MAT_EXTRU_8_DEPTH, mode=Mode.SUBTRACT)

    # Esquisse25 → Enlèv. mat.-Extru.9 (cut)
    with BuildSketch(Plane.ZY.offset(25)):
        with Locations(Location((-11.76, 50.692538359, 0), (0, 0, 270))):
            Circle(ESQUISSE25_R)
        with Locations(Location((-11.76, 50.692538359, 0), (0, 0, 270))):
            Circle(ESQUISSE25_R_2, mode=Mode.SUBTRACT)
    extrude(amount=-ENL_V_MAT_EXTRU_9_DEPTH, mode=Mode.SUBTRACT)

    # Esquisse26 → Enlèv. mat.-Extru.10 (cut, up to next)
    with BuildSketch(Plane.ZY.offset(25), mode=Mode.PRIVATE) as enl_v_mat_extru_10_sk1:
        with Locations(Location((-4.5, 17, 0), (0, 0, 270))):
            Circle(ESQUISSE26_R)
    enl_v_mat_extru_10_tool1 = extrude(enl_v_mat_extru_10_sk1.sketch, amount=-ENL_V_MAT_EXTRU_10_REACH, mode=Mode.PRIVATE) & part.part
    add(enl_v_mat_extru_10_tool1.solids().sort_by_distance((-25, 17, -4.5))[0], mode=Mode.SUBTRACT)

    # Congé4
    cong_4_edges = [part.edges().sort_by_distance(p)[0] for p in [
        (-25, 19.5, -4.5),
        (-20, 19.5, -4.5),
    ]]
    fillet(cong_4_edges, radius=CONG_4_R)

    # Logement d'ergot1 outline → Logement d'ergot1 (cut)
    with BuildSketch(Plane.YZ.offset(LOGEMENT_START)):
        with Locations((-2.5, -4.5)):
            Rectangle(LOGEMENT_D_ERGOT1_OUTLINE_W, LOGEMENT_D_ERGOT1_OUTLINE_H)
    logement_d_ergot1 = extrude(amount=LOGEMENT_D_ERGOT1_DEPTH, mode=Mode.SUBTRACT)

    # Logement d'ergot2 outline → Logement d'ergot2 (cut)
    with BuildSketch(Plane.YZ.offset(LOGEMENT_START)):
        with Locations((64.5, -4.5)):
            Rectangle(LOGEMENT_D_ERGOT2_OUTLINE_W, LOGEMENT_D_ERGOT2_OUTLINE_H)
    logement_d_ergot2 = extrude(amount=LOGEMENT_D_ERGOT2_DEPTH, mode=Mode.SUBTRACT)

    # Répétition linéaire1: Logement d'ergot1, Logement d'ergot2 ×2
    with Locations(*[(0, 0, -i * R_P_TITION_LIN_AIRE1_PITCH) for i in range(1, R_P_TITION_LIN_AIRE1_COUNT)]):
        add(logement_d_ergot1, mode=Mode.SUBTRACT)
        add(logement_d_ergot2, mode=Mode.SUBTRACT)

    # Congé6
    cong_6_edges = [part.edges().sort_by_distance(p)[0] for p in [
        (-5, -5, -4.5),
        (-6.5, -5, -2.5),
        (-6.5, -5, -6.5),
        (-8, -5, -4.5),
        (-5, 67, -4.5),
        (-6.5, 67, -6.5),
        (-6.5, 67, -2.5),
        (-8, 67, -4.5),
        (-5, -5, -16.5),
        (-6.5, -5, -14.5),
        (-6.5, -5, -18.5),
        (-8, -5, -16.5),
        (-5, 67, -16.5),
        (-6.5, 67, -18.5),
        (-6.5, 67, -14.5),
        (-8, 67, -16.5),
    ]]
    fillet(cong_6_edges, radius=CONG_6_R)


solid = part.part
